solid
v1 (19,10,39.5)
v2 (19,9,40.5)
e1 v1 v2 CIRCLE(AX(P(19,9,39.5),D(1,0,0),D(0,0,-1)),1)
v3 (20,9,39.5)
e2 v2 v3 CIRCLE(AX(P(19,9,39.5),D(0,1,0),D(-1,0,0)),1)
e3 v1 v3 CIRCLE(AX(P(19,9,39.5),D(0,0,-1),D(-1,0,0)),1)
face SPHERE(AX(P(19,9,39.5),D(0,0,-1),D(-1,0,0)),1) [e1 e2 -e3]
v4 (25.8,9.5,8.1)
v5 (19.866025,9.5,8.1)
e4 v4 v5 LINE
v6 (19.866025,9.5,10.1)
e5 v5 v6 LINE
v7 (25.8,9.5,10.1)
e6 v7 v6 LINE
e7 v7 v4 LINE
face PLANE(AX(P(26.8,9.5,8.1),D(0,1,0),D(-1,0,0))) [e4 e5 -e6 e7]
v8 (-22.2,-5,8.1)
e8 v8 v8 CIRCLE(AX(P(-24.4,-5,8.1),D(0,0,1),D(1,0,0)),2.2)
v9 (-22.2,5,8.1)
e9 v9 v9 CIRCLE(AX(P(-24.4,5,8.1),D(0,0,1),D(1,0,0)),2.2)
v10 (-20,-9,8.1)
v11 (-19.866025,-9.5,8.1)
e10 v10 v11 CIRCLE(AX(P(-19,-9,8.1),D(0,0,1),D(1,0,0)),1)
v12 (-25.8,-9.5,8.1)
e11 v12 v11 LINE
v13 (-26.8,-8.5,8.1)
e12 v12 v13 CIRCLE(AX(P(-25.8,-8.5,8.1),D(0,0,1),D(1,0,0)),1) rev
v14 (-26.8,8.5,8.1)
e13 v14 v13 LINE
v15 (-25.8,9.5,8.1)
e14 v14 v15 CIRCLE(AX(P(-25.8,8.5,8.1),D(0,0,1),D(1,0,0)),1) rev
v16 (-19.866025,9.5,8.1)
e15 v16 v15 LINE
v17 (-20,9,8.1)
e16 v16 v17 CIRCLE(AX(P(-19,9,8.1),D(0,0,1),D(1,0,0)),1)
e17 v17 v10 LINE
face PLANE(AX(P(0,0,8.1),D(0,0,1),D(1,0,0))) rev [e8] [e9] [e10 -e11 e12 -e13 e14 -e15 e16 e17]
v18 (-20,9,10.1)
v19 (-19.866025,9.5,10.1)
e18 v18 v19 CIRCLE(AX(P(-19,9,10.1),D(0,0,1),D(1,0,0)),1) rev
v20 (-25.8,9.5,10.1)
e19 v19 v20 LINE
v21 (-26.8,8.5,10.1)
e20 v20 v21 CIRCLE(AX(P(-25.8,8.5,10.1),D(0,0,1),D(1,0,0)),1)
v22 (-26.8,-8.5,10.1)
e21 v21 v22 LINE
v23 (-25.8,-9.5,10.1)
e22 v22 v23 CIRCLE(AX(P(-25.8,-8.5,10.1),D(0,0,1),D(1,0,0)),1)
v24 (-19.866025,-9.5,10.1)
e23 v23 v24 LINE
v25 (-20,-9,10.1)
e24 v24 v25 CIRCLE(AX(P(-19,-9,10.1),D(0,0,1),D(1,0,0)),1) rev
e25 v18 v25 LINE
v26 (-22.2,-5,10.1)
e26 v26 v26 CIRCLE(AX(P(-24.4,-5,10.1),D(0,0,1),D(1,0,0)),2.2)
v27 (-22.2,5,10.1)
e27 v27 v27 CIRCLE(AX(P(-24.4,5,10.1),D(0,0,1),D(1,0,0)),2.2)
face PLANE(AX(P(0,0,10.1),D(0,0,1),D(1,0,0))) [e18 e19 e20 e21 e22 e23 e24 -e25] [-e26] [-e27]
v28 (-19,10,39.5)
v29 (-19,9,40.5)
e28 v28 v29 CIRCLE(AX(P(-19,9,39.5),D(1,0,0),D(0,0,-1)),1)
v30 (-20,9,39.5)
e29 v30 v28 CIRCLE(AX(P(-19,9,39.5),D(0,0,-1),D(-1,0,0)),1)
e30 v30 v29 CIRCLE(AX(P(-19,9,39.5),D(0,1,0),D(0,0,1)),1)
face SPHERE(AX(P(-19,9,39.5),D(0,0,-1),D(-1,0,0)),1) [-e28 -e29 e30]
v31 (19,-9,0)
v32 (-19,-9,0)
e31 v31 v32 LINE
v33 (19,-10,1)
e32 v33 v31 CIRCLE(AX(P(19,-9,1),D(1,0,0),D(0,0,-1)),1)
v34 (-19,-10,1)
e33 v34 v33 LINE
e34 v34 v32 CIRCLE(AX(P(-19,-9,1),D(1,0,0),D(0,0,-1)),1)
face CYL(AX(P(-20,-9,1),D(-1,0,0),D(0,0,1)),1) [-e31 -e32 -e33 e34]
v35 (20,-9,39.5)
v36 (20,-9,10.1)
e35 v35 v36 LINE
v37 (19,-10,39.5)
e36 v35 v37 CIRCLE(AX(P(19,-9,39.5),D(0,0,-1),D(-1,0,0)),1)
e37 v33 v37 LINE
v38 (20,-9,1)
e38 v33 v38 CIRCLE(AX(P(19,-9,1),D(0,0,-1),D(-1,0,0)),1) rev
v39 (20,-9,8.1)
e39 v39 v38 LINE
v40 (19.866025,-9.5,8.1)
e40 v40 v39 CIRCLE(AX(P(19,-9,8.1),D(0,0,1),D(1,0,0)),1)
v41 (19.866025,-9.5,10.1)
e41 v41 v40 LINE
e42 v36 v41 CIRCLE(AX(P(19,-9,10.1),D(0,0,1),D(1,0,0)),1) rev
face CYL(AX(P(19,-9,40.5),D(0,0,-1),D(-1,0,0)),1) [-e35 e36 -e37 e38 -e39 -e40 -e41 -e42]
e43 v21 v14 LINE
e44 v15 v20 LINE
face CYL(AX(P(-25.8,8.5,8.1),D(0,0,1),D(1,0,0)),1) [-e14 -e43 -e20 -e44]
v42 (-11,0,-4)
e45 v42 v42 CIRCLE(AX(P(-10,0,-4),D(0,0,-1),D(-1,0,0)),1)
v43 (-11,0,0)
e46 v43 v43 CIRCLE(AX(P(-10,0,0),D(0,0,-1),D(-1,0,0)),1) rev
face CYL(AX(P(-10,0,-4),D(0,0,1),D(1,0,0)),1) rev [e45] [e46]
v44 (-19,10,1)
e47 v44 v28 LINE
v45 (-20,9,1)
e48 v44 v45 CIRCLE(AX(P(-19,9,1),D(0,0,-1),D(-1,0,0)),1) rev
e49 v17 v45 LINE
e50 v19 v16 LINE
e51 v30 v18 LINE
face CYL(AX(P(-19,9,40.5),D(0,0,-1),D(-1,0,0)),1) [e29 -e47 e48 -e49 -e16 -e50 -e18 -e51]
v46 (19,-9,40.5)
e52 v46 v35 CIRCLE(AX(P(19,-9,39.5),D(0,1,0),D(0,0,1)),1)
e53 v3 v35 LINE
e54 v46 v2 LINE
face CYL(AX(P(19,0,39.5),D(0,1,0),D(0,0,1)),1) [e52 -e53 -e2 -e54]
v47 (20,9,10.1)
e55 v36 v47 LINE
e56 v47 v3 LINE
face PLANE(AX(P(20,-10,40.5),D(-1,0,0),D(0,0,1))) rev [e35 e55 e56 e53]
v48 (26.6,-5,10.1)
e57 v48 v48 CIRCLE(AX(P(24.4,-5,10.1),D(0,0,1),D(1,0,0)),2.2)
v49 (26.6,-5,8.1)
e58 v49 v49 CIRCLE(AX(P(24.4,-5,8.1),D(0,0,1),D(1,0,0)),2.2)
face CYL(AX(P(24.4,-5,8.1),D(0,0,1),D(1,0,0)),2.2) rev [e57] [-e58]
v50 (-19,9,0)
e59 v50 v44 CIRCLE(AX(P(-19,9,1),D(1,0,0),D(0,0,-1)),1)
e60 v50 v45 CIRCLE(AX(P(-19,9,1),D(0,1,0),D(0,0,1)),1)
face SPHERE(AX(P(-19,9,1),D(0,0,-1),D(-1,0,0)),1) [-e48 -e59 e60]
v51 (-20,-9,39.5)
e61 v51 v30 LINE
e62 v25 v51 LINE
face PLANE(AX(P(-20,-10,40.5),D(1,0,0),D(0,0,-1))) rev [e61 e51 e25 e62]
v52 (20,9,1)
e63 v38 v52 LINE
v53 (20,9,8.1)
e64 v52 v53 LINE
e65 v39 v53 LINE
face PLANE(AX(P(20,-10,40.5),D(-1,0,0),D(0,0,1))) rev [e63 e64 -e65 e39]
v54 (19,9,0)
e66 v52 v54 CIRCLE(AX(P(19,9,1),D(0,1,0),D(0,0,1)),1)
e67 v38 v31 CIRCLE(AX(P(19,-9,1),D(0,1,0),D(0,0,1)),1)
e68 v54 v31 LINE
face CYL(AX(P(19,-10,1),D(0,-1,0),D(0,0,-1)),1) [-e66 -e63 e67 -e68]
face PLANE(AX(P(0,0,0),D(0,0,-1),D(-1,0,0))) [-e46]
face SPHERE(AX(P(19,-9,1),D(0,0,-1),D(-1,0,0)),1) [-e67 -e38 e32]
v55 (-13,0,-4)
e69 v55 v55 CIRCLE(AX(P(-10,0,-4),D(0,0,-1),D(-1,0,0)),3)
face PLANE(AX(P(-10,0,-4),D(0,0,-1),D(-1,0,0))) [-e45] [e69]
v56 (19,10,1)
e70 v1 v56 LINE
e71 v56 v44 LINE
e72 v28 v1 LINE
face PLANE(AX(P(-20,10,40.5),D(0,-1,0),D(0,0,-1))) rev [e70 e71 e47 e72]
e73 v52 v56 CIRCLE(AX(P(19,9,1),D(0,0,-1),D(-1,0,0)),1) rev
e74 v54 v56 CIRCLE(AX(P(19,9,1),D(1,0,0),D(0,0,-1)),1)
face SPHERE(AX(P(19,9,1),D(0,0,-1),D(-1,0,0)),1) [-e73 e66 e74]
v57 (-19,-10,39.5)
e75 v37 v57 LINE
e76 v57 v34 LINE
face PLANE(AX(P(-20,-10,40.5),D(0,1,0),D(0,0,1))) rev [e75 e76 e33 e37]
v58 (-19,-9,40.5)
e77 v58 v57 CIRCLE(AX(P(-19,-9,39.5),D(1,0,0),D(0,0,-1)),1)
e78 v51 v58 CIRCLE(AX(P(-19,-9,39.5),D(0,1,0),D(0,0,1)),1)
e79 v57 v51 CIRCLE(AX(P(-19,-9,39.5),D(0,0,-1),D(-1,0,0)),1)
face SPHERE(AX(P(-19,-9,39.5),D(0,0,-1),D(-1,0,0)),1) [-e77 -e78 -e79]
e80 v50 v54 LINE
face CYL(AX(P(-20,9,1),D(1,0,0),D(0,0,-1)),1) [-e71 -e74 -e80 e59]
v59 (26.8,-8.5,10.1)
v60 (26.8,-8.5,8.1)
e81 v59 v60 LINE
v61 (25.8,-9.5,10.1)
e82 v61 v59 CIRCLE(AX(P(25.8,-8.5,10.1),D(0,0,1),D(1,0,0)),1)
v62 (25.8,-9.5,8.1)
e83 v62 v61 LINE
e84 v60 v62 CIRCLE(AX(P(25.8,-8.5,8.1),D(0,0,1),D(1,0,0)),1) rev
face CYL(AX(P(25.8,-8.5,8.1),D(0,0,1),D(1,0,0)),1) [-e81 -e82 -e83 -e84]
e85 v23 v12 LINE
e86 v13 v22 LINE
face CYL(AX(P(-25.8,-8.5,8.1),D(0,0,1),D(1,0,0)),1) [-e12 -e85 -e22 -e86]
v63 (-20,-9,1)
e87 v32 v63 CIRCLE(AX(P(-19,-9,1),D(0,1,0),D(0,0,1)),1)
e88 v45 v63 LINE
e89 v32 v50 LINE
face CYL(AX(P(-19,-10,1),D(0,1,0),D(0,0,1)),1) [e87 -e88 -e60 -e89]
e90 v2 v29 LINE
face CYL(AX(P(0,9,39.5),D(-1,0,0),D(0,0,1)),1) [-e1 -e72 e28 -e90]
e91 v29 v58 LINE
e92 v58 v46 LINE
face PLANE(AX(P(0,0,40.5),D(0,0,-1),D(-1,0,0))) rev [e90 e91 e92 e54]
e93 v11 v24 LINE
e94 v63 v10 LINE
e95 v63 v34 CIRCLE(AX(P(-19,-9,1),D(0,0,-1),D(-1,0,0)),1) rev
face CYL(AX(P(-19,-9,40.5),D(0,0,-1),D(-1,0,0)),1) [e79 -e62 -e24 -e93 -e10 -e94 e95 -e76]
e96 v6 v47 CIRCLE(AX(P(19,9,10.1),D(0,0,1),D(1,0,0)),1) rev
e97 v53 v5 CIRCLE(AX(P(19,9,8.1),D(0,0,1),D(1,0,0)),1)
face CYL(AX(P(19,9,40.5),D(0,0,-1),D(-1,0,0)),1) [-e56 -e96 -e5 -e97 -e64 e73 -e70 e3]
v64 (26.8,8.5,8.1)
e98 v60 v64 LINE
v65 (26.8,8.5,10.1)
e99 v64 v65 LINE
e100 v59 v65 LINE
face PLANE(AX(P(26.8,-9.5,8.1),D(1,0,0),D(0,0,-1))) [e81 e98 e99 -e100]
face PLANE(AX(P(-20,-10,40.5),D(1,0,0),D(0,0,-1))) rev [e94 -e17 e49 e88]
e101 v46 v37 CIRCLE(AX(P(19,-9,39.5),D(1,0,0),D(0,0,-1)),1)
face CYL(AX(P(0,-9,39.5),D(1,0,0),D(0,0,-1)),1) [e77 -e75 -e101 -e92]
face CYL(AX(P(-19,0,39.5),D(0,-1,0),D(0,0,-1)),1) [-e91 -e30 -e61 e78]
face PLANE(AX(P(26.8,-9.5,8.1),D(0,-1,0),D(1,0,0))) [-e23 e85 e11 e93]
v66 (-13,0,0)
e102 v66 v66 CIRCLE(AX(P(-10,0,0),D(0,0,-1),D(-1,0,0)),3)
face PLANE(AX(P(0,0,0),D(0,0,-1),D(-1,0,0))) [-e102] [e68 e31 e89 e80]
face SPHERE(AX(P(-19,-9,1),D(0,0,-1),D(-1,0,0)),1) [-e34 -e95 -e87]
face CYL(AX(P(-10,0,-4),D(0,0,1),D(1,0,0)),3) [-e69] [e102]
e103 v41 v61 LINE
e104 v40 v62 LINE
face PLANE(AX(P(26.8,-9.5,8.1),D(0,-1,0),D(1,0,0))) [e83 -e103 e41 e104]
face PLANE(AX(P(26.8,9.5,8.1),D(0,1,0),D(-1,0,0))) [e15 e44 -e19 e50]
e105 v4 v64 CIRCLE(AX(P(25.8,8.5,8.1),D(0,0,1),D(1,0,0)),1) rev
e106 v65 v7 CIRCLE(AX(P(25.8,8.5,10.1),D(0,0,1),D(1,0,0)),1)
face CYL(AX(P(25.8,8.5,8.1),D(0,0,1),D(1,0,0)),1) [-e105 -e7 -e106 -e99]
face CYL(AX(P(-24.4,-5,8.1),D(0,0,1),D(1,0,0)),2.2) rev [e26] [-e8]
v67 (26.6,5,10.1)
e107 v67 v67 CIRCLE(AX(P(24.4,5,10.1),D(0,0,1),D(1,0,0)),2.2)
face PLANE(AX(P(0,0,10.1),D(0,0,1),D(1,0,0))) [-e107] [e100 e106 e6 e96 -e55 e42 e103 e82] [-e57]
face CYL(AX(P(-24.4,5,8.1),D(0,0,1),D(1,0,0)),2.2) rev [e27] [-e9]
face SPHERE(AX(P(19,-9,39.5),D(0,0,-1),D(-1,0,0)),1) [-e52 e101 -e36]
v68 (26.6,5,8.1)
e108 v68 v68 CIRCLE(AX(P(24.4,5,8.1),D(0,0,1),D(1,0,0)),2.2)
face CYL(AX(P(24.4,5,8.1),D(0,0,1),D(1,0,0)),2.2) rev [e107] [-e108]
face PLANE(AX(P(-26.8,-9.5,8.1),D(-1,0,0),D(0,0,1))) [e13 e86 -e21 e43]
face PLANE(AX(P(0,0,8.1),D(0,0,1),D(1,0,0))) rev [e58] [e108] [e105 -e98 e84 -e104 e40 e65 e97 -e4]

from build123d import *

# Parameters (mm, degrees)
SKETCH1_W           = 40
SKETCH1_H           = 20
BOSS_EXTRUDE1_DEPTH = 40.5
SKETCH2_W           = 53.6
SKETCH2_H           = 19
BOSS_EXTRUDE2_DEPTH = 2
SKETCH3_R           = 2.2
CUT_EXTRUDE1_DEPTH  = 2
SKETCH4_R           = 3
SKETCH4_R_2         = 1
BOSS_EXTRUDE3_DEPTH = 4
FILLET1_R           = 1
FILLET2_R           = 1


with BuildPart() as part:
    # Sketch1 → Boss-Extrude1 (new body)
    with BuildSketch(Plane.XY):
        Rectangle(SKETCH1_W, SKETCH1_H)
    extrude(amount=BOSS_EXTRUDE1_DEPTH)

    # Sketch2 → Boss-Extrude2 (add)
    with BuildSketch(Plane.XY.offset(10.1)):
        Rectangle(SKETCH2_W, SKETCH2_H)
    extrude(amount=-BOSS_EXTRUDE2_DEPTH)

    # Sketch3 → Cut-Extrude1 (cut)
    with BuildSketch(Plane.XY.offset(10.1)):
        with Locations((-24.4, 5)):
            Circle(SKETCH3_R)
        with Locations((-24.4, -5)):
            Circle(SKETCH3_R)
        with Locations((24.4, 5)):
            Circle(SKETCH3_R)
        with Locations((24.4, -5)):
            Circle(SKETCH3_R)
    extrude(amount=-CUT_EXTRUDE1_DEPTH, mode=Mode.SUBTRACT)

    # Sketch4 → Boss-Extrude3 (add)
    with BuildSketch(Plane(origin=(0, 0, 0), x_dir=(-1, 0, 0), z_dir=(0, 0, -1))):
        with Locations((10, 0)):
            Circle(SKETCH4_R)
        with Locations((10, 0)):
            Circle(SKETCH4_R_2, mode=Mode.SUBTRACT)
    extrude(amount=BOSS_EXTRUDE3_DEPTH)

    # Fillet1
    # the kernel refuses this fillet: 1 mm, written as the material it takes off along each edge
    with BuildSketch(Plane(origin=(-26.8, -9.5, 12.6), x_dir=(1, 0, 0), z_dir=(0, 0, -1)), Plane(origin=(26.8, 9.5, 12.6), x_dir=(-1, 0, 0), z_dir=(0, 0, -1))) as fillet1_piece_1:
        with BuildLine():
            CenterArc((FILLET1_R, -FILLET1_R), FILLET1_R, 90, 90)
            Line((0, -FILLET1_R), (0, 0))
            Line((0, 0), (FILLET1_R, 0))
        make_face()
    extrude(amount=7, mode=Mode.SUBTRACT)
    with BuildSketch(Plane(origin=(-26.8, 9.5, 12.6), x_dir=(1, 0, 0), z_dir=(0, 0, -1)), Plane(origin=(26.8, -9.5, 12.6), x_dir=(-1, 0, 0), z_dir=(0, 0, -1))) as fillet1_piece_2:
        with BuildLine():
            CenterArc((FILLET1_R, FILLET1_R), FILLET1_R, 180, 90)
            Line((0, FILLET1_R), (0, 0))
            Line((0, 0), (FILLET1_R, 0))
        make_face()
    extrude(amount=7, mode=Mode.SUBTRACT)
    with BuildSketch(Plane(origin=(-20, 10, -2.5), x_dir=(0, -1, 0), z_dir=(0, 0, 1))) as fillet1_piece_3_section:
        with BuildLine():
            CenterArc((FILLET1_R, FILLET1_R), FILLET1_R, 180, 90)
            Line((0, FILLET1_R), (0, 0))
            Line((0, 0), (FILLET1_R, 0))
        make_face()
    fillet1_piece_3 = extrude(amount=45.5, mode=Mode.PRIVATE)
    fillet1_piece_3 = split(fillet1_piece_3, bisect_by=Plane(origin=(-19.975991618, 9.336749215, 8.1), z_dir=(0, 0, -1)), keep=Keep.TOP, mode=Mode.PRIVATE)
    fillet1_piece_3 = split(fillet1_piece_3, bisect_by=Plane(origin=(-19.975991618, 9.5, 2.8), z_dir=(0, -1, 0)), keep=Keep.TOP, mode=Mode.PRIVATE)
    add(fillet1_piece_3, mode=Mode.SUBTRACT)
    with BuildSketch(Plane(origin=(-20, 10, -2.5), x_dir=(0, -1, 0), z_dir=(0, 0, 1))) as fillet1_piece_4_section:
        with BuildLine():
            CenterArc((FILLET1_R, FILLET1_R), FILLET1_R, 180, 90)
            Line((0, FILLET1_R), (0, 0))
            Line((0, 0), (FILLET1_R, 0))
        make_face()
    fillet1_piece_4 = extrude(amount=45.5, mode=Mode.PRIVATE)
    fillet1_piece_4 = split(fillet1_piece_4, bisect_by=Plane(origin=(-19.74487994, 9.835608236, 8.1), z_dir=(0, 0, -1)), keep=Keep.TOP, mode=Mode.PRIVATE)
    fillet1_piece_4 = split(fillet1_piece_4, bisect_by=Plane(origin=(-19.74487994, 9.5, 2.8), z_dir=(0, 1, 0)), keep=Keep.TOP, mode=Mode.PRIVATE)
    add(fillet1_piece_4, mode=Mode.SUBTRACT)
    with BuildSketch(Plane(origin=(-20, 10, -2.5), x_dir=(0, -1, 0), z_dir=(0, 0, 1))) as fillet1_piece_5_section:
        with BuildLine():
            CenterArc((FILLET1_R, FILLET1_R), FILLET1_R, 180, 90)
            Line((0, FILLET1_R), (0, 0))
            Line((0, 0), (FILLET1_R, 0))
        make_face()
    fillet1_piece_5 = extrude(amount=45.5, mode=Mode.PRIVATE)
    fillet1_piece_5 = split(fillet1_piece_5, bisect_by=Plane(origin=(-19.74487994, 9.835608236, 8.1), z_dir=(0, 0, 1)), keep=Keep.TOP, mode=Mode.PRIVATE)
    fillet1_piece_5 = split(fillet1_piece_5, bisect_by=Plane(origin=(-19.74487994, 9.5, 9.1), z_dir=(0, 1, 0)), keep=Keep.TOP, mode=Mode.PRIVATE)
    fillet1_piece_5 = split(fillet1_piece_5, bisect_by=Plane(origin=(-19.74487994, 9.835608236, 10.1), z_dir=(0, 0, -1)), keep=Keep.TOP, mode=Mode.PRIVATE)
    add(fillet1_piece_5, mode=Mode.SUBTRACT)
    with BuildSketch(Plane(origin=(-20, 10, -2.5), x_dir=(0, -1, 0), z_dir=(0, 0, 1))) as fillet1_piece_6_section:
        with BuildLine():
            CenterArc((FILLET1_R, FILLET1_R), FILLET1_R, 180, 90)
            Line((0, FILLET1_R), (0, 0))
            Line((0, 0), (FILLET1_R, 0))
        make_face()
    fillet1_piece_6 = extrude(amount=45.5, mode=Mode.PRIVATE)
    fillet1_piece_6 = split(fillet1_piece_6, bisect_by=Plane(origin=(-19.975991618, 9.5, 26.55), z_dir=(0, -1, 0)), keep=Keep.TOP, mode=Mode.PRIVATE)
    fillet1_piece_6 = split(fillet1_piece_6, bisect_by=Plane(origin=(-19.975991618, 9.336749215, 10.1), z_dir=(0, 0, 1)), keep=Keep.TOP, mode=Mode.PRIVATE)
    add(fillet1_piece_6, mode=Mode.SUBTRACT)
    with BuildSketch(Plane(origin=(-20, 10, -2.5), x_dir=(0, -1, 0), z_dir=(0, 0, 1))) as fillet1_piece_7_section:
        with BuildLine():
            CenterArc((FILLET1_R, FILLET1_R), FILLET1_R, 180, 90)
            Line((0, FILLET1_R), (0, 0))
            Line((0, 0), (FILLET1_R, 0))
        make_face()
    fillet1_piece_7 = extrude(amount=45.5, mode=Mode.PRIVATE)
    fillet1_piece_7 = split(fillet1_piece_7, bisect_by=Plane(origin=(-19.74487994, 9.5, 26.55), z_dir=(0, 1, 0)), keep=Keep.TOP, mode=Mode.PRIVATE)
    fillet1_piece_7 = split(fillet1_piece_7, bisect_by=Plane(origin=(-19.74487994, 9.835608236, 10.1), z_dir=(0, 0, 1)), keep=Keep.TOP, mode=Mode.PRIVATE)
    add(fillet1_piece_7, mode=Mode.SUBTRACT)
    with BuildSketch(Plane(origin=(20, 10, -2.5), x_dir=(0, -1, 0), z_dir=(0, 0, 1))) as fillet1_piece_8_section:
        with BuildLine():
            CenterArc((FILLET1_R, -FILLET1_R), FILLET1_R, 90, 90)
            Line((0, -FILLET1_R), (0, 0))
            Line((0, 0), (FILLET1_R, 0))
        make_face()
    fillet1_piece_8 = extrude(amount=45.5, mode=Mode.PRIVATE)
    fillet1_piece_8 = split(fillet1_piece_8, bisect_by=Plane(origin=(19.975991618, 9.5, 2.8), z_dir=(0, -1, 0)), keep=Keep.TOP, mode=Mode.PRIVATE)
    fillet1_piece_8 = split(fillet1_piece_8, bisect_by=Plane(origin=(19.975991618, 9.336749215, 8.1), z_dir=(0, 0, -1)), keep=Keep.TOP, mode=Mode.PRIVATE)
    add(fillet1_piece_8, mode=Mode.SUBTRACT)
    with BuildSketch(Plane(origin=(20, 10, -2.5), x_dir=(0, -1, 0), z_dir=(0, 0, 1))) as fillet1_piece_9_section:
        with BuildLine():
            CenterArc((FILLET1_R, -FILLET1_R), FILLET1_R, 90, 90)
            Line((0, -FILLET1_R), (0, 0))
            Line((0, 0), (FILLET1_R, 0))
        make_face()
    fillet1_piece_9 = extrude(amount=45.5, mode=Mode.PRIVATE)
    fillet1_piece_9 = split(fillet1_piece_9, bisect_by=Plane(origin=(19.74487994, 9.5, 2.8), z_dir=(0, 1, 0)), keep=Keep.TOP, mode=Mode.PRIVATE)
    fillet1_piece_9 = split(fillet1_piece_9, bisect_by=Plane(origin=(19.74487994, 9.835608236, 8.1), z_dir=(0, 0, -1)), keep=Keep.TOP, mode=Mode.PRIVATE)
    add(fillet1_piece_9, mode=Mode.SUBTRACT)
    with BuildSketch(Plane(origin=(20, 10, -2.5), x_dir=(0, -1, 0), z_dir=(0, 0, 1))) as fillet1_piece_10_section:
        with BuildLine():
            CenterArc((FILLET1_R, -FILLET1_R), FILLET1_R, 90, 90)
            Line((0, -FILLET1_R), (0, 0))
            Line((0, 0), (FILLET1_R, 0))
        make_face()
    fillet1_piece_10 = extrude(amount=45.5, mode=Mode.PRIVATE)
    fillet1_piece_10 = split(fillet1_piece_10, bisect_by=Plane(origin=(19.74487994, 9.835608236, 10.1), z_dir=(0, 0, -1)), keep=Keep.TOP, mode=Mode.PRIVATE)
    fillet1_piece_10 = split(fillet1_piece_10, bisect_by=Plane(origin=(19.74487994, 9.5, 9.1), z_dir=(0, 1, 0)), keep=Keep.TOP, mode=Mode.PRIVATE)
    fillet1_piece_10 = split(fillet1_piece_10, bisect_by=Plane(origin=(19.74487994, 9.835608236, 8.1), z_dir=(0, 0, 1)), keep=Keep.TOP, mode=Mode.PRIVATE)
    add(fillet1_piece_10, mode=Mode.SUBTRACT)
    with BuildSketch(Plane(origin=(20, 10, -2.5), x_dir=(0, -1, 0), z_dir=(0, 0, 1))) as fillet1_piece_11_section:
        with BuildLine():
            CenterArc((FILLET1_R, -FILLET1_R), FILLET1_R, 90, 90)
            Line((0, -FILLET1_R), (0, 0))
            Line((0, 0), (FILLET1_R, 0))
        make_face()
    fillet1_piece_11 = extrude(amount=45.5, mode=Mode.PRIVATE)
    fillet1_piece_11 = split(fillet1_piece_11, bisect_by=Plane(origin=(19.975991618, 9.336749215, 10.1), z_dir=(0, 0, 1)), keep=Keep.TOP, mode=Mode.PRIVATE)
    fillet1_piece_11 = split(fillet1_piece_11, bisect_by=Plane(origin=(19.975991618, 9.5, 26.55), z_dir=(0, -1, 0)), keep=Keep.TOP, mode=Mode.PRIVATE)
    add(fillet1_piece_11, mode=Mode.SUBTRACT)
    with BuildSketch(Plane(origin=(20, 10, -2.5), x_dir=(0, -1, 0), z_dir=(0, 0, 1))) as fillet1_piece_12_section:
        with BuildLine():
            CenterArc((FILLET1_R, -FILLET1_R), FILLET1_R, 90, 90)
            Line((0, -FILLET1_R), (0, 0))
            Line((0, 0), (FILLET1_R, 0))
        make_face()
    fillet1_piece_12 = extrude(amount=45.5, mode=Mode.PRIVATE)
    fillet1_piece_12 = split(fillet1_piece_12, bisect_by=Plane(origin=(19.74487994, 9.835608236, 10.1), z_dir=(0, 0, 1)), keep=Keep.TOP, mode=Mode.PRIVATE)
    fillet1_piece_12 = split(fillet1_piece_12, bisect_by=Plane(origin=(19.74487994, 9.5, 26.55), z_dir=(0, 1, 0)), keep=Keep.TOP, mode=Mode.PRIVATE)
    add(fillet1_piece_12, mode=Mode.SUBTRACT)
    with BuildSketch(Plane(origin=(-20, -10, -2.5), x_dir=(1, 0, 0), z_dir=(0, 0, 1))) as fillet1_piece_13_section:
        with BuildLine():
            CenterArc((FILLET1_R, FILLET1_R), FILLET1_R, 180, 90)
            Line((0, FILLET1_R), (0, 0))
            Line((0, 0), (FILLET1_R, 0))
        make_face()
    fillet1_piece_13 = extrude(amount=45.5, mode=Mode.PRIVATE)
    fillet1_piece_13 = split(fillet1_piece_13, bisect_by=Plane(origin=(-19.74487994, -9.835608236, 8.1), z_dir=(0, 0, -1)), keep=Keep.TOP, mode=Mode.PRIVATE)
    fillet1_piece_13 = split(fillet1_piece_13, bisect_by=Plane(origin=(-19.74487994, -9.5, 2.8), z_dir=(0, -1, 0)), keep=Keep.TOP, mode=Mode.PRIVATE)
    add(fillet1_piece_13, mode=Mode.SUBTRACT)
    with BuildSketch(Plane(origin=(-20, -10, -2.5), x_dir=(1, 0, 0), z_dir=(0, 0, 1))) as fillet1_piece_14_section:
        with BuildLine():
            CenterArc((FILLET1_R, FILLET1_R), FILLET1_R, 180, 90)
            Line((0, FILLET1_R), (0, 0))
            Line((0, 0), (FILLET1_R, 0))
        make_face()
    fillet1_piece_14 = extrude(amount=45.5, mode=Mode.PRIVATE)
    fillet1_piece_14 = split(fillet1_piece_14, bisect_by=Plane(origin=(-19.975991618, -9.336749215, 8.1), z_dir=(0, 0, -1)), keep=Keep.TOP, mode=Mode.PRIVATE)
    fillet1_piece_14 = split(fillet1_piece_14, bisect_by=Plane(origin=(-19.975991618, -9.5, 2.8), z_dir=(0, 1, 0)), keep=Keep.TOP, mode=Mode.PRIVATE)
    add(fillet1_piece_14, mode=Mode.SUBTRACT)
    with BuildSketch(Plane(origin=(-20, -10, -2.5), x_dir=(1, 0, 0), z_dir=(0, 0, 1))) as fillet1_piece_15_section:
        with BuildLine():
            CenterArc((FILLET1_R, FILLET1_R), FILLET1_R, 180, 90)
            Line((0, FILLET1_R), (0, 0))
            Line((0, 0), (FILLET1_R, 0))
        make_face()
    fillet1_piece_15 = extrude(amount=45.5, mode=Mode.PRIVATE)
    fillet1_piece_15 = split(fillet1_piece_15, bisect_by=Plane(origin=(-19.74487994, -9.835608236, 8.1), z_dir=(0, 0, 1)), keep=Keep.TOP, mode=Mode.PRIVATE)
    fillet1_piece_15 = split(fillet1_piece_15, bisect_by=Plane(origin=(-19.74487994, -9.835608236, 10.1), z_dir=(0, 0, -1)), keep=Keep.TOP, mode=Mode.PRIVATE)
    fillet1_piece_15 = split(fillet1_piece_15, bisect_by=Plane(origin=(-19.74487994, -9.5, 9.1), z_dir=(0, -1, 0)), keep=Keep.TOP, mode=Mode.PRIVATE)
    add(fillet1_piece_15, mode=Mode.SUBTRACT)
    with BuildSketch(Plane(origin=(-20, -10, -2.5), x_dir=(1, 0, 0), z_dir=(0, 0, 1))) as fillet1_piece_16_section:
        with BuildLine():
            CenterArc((FILLET1_R, FILLET1_R), FILLET1_R, 180, 90)
            Line((0, FILLET1_R), (0, 0))
            Line((0, 0), (FILLET1_R, 0))
        make_face()
    fillet1_piece_16 = extrude(amount=45.5, mode=Mode.PRIVATE)
    fillet1_piece_16 = split(fillet1_piece_16, bisect_by=Plane(origin=(-19.74487994, -9.835608236, 10.1), z_dir=(0, 0, 1)), keep=Keep.TOP, mode=Mode.PRIVATE)
    fillet1_piece_16 = split(fillet1_piece_16, bisect_by=Plane(origin=(-19.74487994, -9.5, 26.55), z_dir=(0, -1, 0)), keep=Keep.TOP, mode=Mode.PRIVATE)
    add(fillet1_piece_16, mode=Mode.SUBTRACT)
    with BuildSketch(Plane(origin=(-20, -10, -2.5), x_dir=(1, 0, 0), z_dir=(0, 0, 1))) as fillet1_piece_17_section:
        with BuildLine():
            CenterArc((FILLET1_R, FILLET1_R), FILLET1_R, 180, 90)
            Line((0, FILLET1_R), (0, 0))
            Line((0, 0), (FILLET1_R, 0))
        make_face()
    fillet1_piece_17 = extrude(amount=45.5, mode=Mode.PRIVATE)
    fillet1_piece_17 = split(fillet1_piece_17, bisect_by=Plane(origin=(-19.975991618, -9.336749215, 10.1), z_dir=(0, 0, 1)), keep=Keep.TOP, mode=Mode.PRIVATE)
    fillet1_piece_17 = split(fillet1_piece_17, bisect_by=Plane(origin=(-19.975991618, -9.5, 26.55), z_dir=(0, 1, 0)), keep=Keep.TOP, mode=Mode.PRIVATE)
    add(fillet1_piece_17, mode=Mode.SUBTRACT)
    with BuildSketch(Plane(origin=(20, -10, -2.5), x_dir=(-1, 0, 0), z_dir=(0, 0, 1))) as fillet1_piece_18_section:
        with BuildLine():
            CenterArc((FILLET1_R, -FILLET1_R), FILLET1_R, 90, 90)
            Line((0, -FILLET1_R), (0, 0))
            Line((0, 0), (FILLET1_R, 0))
        make_face()
    fillet1_piece_18 = extrude(amount=45.5, mode=Mode.PRIVATE)
    fillet1_piece_18 = split(fillet1_piece_18, bisect_by=Plane(origin=(19.74487994, -9.835608236, 8.1), z_dir=(0, 0, -1)), keep=Keep.TOP, mode=Mode.PRIVATE)
    fillet1_piece_18 = split(fillet1_piece_18, bisect_by=Plane(origin=(19.74487994, -9.5, 2.8), z_dir=(0, -1, 0)), keep=Keep.TOP, mode=Mode.PRIVATE)
    add(fillet1_piece_18, mode=Mode.SUBTRACT)
    with BuildSketch(Plane(origin=(20, -10, -2.5), x_dir=(-1, 0, 0), z_dir=(0, 0, 1))) as fillet1_piece_19_section:
        with BuildLine():
            CenterArc((FILLET1_R, -FILLET1_R), FILLET1_R, 90, 90)
            Line((0, -FILLET1_R), (0, 0))
            Line((0, 0), (FILLET1_R, 0))
        make_face()
    fillet1_piece_19 = extrude(amount=45.5, mode=Mode.PRIVATE)
    fillet1_piece_19 = split(fillet1_piece_19, bisect_by=Plane(origin=(19.975991618, -9.336749215, 8.1), z_dir=(0, 0, -1)), keep=Keep.TOP, mode=Mode.PRIVATE)
    fillet1_piece_19 = split(fillet1_piece_19, bisect_by=Plane(origin=(19.975991618, -9.5, 2.8), z_dir=(0, 1, 0)), keep=Keep.TOP, mode=Mode.PRIVATE)
    add(fillet1_piece_19, mode=Mode.SUBTRACT)
    with BuildSketch(Plane(origin=(20, -10, -2.5), x_dir=(-1, 0, 0), z_dir=(0, 0, 1))) as fillet1_piece_20_section:
        with BuildLine():
            CenterArc((FILLET1_R, -FILLET1_R), FILLET1_R, 90, 90)
            Line((0, -FILLET1_R), (0, 0))
            Line((0, 0), (FILLET1_R, 0))
        make_face()
    fillet1_piece_20 = extrude(amount=45.5, mode=Mode.PRIVATE)
    fillet1_piece_20 = split(fillet1_piece_20, bisect_by=Plane(origin=(19.74487994, -9.835608236, 10.1), z_dir=(0, 0, -1)), keep=Keep.TOP, mode=Mode.PRIVATE)
    fillet1_piece_20 = split(fillet1_piece_20, bisect_by=Plane(origin=(19.74487994, -9.835608236, 8.1), z_dir=(0, 0, 1)), keep=Keep.TOP, mode=Mode.PRIVATE)
    fillet1_piece_20 = split(fillet1_piece_20, bisect_by=Plane(origin=(19.74487994, -9.5, 9.1), z_dir=(0, -1, 0)), keep=Keep.TOP, mode=Mode.PRIVATE)
    add(fillet1_piece_20, mode=Mode.SUBTRACT)
    with BuildSketch(Plane(origin=(20, -10, -2.5), x_dir=(-1, 0, 0), z_dir=(0, 0, 1))) as fillet1_piece_21_section:
        with BuildLine():
            CenterArc((FILLET1_R, -FILLET1_R), FILLET1_R, 90, 90)
            Line((0, -FILLET1_R), (0, 0))
            Line((0, 0), (FILLET1_R, 0))
        make_face()
    fillet1_piece_21 = extrude(amount=45.5, mode=Mode.PRIVATE)
    fillet1_piece_21 = split(fillet1_piece_21, bisect_by=Plane(origin=(19.74487994, -9.835608236, 10.1), z_dir=(0, 0, 1)), keep=Keep.TOP, mode=Mode.PRIVATE)
    fillet1_piece_21 = split(fillet1_piece_21, bisect_by=Plane(origin=(19.74487994, -9.5, 26.55), z_dir=(0, -1, 0)), keep=Keep.TOP, mode=Mode.PRIVATE)
    add(fillet1_piece_21, mode=Mode.SUBTRACT)
    with BuildSketch(Plane(origin=(20, -10, -2.5), x_dir=(-1, 0, 0), z_dir=(0, 0, 1))) as fillet1_piece_22_section:
        with BuildLine():
            CenterArc((FILLET1_R, -FILLET1_R), FILLET1_R, 90, 90)
            Line((0, -FILLET1_R), (0, 0))
            Line((0, 0), (FILLET1_R, 0))
        make_face()
    fillet1_piece_22 = extrude(amount=45.5, mode=Mode.PRIVATE)
    fillet1_piece_22 = split(fillet1_piece_22, bisect_by=Plane(origin=(19.975991618, -9.336749215, 10.1), z_dir=(0, 0, 1)), keep=Keep.TOP, mode=Mode.PRIVATE)
    fillet1_piece_22 = split(fillet1_piece_22, bisect_by=Plane(origin=(19.975991618, -9.5, 26.55), z_dir=(0, 1, 0)), keep=Keep.TOP, mode=Mode.PRIVATE)
    add(fillet1_piece_22, mode=Mode.SUBTRACT)

    # Fillet2
    fillet2_edges = [part.edges().sort_by_distance(p)[0] for p in [
        (-20, 0, 0),
        (-20, 0, 40.5),
        (20, 0, 0),
        (0, -10, 0),
        (0, 10, 0),
        (19.707106781, -9.707106781, 0),
        (-19.707106781, -9.707106781, 0),
        (19.707106781, 9.707106781, 0),
        (-19.707106781, 9.707106781, 0),
        (0, 10, 40.5),
        (20, 0, 40.5),
        (0, -10, 40.5),
        (19.707106781, -9.707106781, 40.5),
        (-19.707106781, -9.707106781, 40.5),
        (19.707106781, 9.707106781, 40.5),
        (-19.707106781, 9.707106781, 40.5),
    ]]
    fillet(fillet2_edges, radius=FILLET2_R)


solid = part.part
